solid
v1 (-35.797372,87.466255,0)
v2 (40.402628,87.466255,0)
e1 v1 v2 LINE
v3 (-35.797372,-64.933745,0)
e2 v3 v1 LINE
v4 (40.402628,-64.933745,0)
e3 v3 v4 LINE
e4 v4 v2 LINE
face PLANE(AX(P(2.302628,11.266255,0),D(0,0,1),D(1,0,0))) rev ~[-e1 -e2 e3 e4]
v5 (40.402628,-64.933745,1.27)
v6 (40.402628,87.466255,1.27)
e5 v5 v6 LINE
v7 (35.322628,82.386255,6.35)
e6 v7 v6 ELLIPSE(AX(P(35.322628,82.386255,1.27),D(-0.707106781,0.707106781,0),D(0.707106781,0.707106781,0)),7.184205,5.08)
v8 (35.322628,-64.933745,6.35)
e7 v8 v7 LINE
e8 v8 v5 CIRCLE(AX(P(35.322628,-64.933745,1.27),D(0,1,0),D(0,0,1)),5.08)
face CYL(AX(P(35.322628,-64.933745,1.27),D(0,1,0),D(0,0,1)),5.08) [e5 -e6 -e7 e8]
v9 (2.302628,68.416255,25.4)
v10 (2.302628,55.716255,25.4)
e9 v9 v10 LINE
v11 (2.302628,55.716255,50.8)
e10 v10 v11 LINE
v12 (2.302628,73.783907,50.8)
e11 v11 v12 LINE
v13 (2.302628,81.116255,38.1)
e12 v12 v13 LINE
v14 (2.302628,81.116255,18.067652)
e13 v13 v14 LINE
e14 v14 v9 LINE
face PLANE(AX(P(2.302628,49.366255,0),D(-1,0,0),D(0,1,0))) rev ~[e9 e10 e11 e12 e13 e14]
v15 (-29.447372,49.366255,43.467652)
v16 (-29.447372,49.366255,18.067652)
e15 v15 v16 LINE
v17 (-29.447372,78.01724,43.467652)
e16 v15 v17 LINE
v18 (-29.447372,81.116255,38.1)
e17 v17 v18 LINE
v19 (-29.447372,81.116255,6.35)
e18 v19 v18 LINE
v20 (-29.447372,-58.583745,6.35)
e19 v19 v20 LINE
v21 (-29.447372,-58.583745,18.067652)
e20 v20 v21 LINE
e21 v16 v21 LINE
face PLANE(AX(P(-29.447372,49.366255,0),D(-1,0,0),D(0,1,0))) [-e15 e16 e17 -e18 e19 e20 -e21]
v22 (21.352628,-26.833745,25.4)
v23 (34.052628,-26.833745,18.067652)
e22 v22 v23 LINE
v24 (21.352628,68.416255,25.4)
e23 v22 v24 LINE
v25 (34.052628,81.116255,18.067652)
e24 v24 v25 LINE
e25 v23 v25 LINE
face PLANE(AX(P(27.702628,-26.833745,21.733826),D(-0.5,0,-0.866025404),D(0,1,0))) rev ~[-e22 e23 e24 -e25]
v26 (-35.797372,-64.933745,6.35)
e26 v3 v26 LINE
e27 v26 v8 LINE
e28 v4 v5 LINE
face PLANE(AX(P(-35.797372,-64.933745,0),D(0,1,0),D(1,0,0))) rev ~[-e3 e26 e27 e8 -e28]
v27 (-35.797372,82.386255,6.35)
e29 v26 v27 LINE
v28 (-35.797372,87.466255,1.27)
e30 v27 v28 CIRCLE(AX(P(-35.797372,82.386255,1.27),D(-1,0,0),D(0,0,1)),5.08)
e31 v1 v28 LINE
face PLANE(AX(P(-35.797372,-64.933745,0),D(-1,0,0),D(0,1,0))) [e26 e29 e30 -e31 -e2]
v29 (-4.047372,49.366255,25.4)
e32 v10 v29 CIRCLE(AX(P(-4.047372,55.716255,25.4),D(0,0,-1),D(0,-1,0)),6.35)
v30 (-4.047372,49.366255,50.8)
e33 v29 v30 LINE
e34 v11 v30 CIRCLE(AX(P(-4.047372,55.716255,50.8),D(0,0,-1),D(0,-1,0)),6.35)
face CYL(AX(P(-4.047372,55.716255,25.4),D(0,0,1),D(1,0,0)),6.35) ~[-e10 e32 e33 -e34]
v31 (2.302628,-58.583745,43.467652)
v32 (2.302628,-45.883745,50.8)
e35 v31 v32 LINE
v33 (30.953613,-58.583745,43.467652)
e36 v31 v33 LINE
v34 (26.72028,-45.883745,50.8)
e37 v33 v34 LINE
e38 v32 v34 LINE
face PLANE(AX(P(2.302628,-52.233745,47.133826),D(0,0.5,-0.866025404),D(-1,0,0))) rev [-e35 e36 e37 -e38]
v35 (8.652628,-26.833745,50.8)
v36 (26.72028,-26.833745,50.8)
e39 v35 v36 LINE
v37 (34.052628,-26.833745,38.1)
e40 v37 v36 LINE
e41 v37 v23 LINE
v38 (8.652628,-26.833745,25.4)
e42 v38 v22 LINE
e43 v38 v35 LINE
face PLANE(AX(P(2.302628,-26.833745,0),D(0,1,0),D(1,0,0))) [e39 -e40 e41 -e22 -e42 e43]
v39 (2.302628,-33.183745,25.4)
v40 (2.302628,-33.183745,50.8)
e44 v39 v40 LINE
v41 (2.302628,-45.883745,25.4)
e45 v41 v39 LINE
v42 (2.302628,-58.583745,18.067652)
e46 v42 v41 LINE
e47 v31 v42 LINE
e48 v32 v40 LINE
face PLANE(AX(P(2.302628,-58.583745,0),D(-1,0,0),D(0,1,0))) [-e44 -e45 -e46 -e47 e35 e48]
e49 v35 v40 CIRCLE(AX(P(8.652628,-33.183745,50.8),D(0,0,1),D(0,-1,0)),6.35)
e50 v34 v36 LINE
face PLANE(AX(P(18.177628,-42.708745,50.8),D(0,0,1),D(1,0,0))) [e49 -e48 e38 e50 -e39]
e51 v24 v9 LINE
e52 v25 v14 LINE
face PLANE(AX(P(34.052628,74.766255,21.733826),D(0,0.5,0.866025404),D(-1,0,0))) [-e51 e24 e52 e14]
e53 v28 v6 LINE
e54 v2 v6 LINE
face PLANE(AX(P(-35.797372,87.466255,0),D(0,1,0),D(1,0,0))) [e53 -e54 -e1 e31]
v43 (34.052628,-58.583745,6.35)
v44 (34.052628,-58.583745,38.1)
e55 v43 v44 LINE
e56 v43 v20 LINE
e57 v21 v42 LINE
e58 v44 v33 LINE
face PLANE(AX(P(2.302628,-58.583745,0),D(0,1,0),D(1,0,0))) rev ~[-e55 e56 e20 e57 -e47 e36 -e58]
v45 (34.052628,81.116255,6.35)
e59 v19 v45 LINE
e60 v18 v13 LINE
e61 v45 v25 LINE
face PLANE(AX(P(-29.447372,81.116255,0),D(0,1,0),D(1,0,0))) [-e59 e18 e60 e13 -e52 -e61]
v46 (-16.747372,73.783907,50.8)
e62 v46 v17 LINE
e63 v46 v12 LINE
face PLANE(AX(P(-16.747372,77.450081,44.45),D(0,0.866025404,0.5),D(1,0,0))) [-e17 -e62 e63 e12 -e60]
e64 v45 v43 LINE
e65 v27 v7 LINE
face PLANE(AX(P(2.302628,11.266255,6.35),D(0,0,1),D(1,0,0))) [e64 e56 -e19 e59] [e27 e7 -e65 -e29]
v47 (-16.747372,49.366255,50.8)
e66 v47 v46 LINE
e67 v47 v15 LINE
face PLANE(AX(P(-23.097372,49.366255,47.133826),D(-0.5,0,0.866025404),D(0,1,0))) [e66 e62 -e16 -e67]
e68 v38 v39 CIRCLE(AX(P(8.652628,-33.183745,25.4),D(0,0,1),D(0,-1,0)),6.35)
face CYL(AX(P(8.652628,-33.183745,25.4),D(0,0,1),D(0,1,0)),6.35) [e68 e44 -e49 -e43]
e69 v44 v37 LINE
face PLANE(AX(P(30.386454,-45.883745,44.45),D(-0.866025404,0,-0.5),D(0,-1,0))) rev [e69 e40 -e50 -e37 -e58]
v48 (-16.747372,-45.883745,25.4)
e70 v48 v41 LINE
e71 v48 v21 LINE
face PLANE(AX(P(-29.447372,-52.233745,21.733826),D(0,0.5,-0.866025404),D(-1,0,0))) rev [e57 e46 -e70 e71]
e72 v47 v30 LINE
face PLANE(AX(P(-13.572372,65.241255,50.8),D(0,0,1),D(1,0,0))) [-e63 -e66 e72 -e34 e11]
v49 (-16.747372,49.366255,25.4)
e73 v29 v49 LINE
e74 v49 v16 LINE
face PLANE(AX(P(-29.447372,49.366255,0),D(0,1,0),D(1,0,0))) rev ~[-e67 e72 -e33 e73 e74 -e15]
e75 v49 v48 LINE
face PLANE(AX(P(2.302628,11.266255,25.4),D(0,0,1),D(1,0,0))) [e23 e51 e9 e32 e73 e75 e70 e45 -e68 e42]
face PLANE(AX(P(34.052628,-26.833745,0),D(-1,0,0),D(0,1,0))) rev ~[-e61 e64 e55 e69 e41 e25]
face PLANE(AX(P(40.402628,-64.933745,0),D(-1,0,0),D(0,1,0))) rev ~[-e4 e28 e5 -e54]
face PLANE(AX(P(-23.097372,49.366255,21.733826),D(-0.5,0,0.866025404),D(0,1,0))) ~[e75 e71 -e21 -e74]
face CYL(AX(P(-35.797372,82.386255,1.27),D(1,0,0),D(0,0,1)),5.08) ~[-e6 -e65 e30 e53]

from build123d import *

# Parameters (mm, degrees)
F0_W        = 76.2
F0_H        = 152.4
F1_DEPTH    = 6.35
F2_DEPTH    = 25.4
F0_W_2      = 31.75
F0_H_2      = 31.75
F3_DEPTH    = 50.8
F4_C1_SIZE2 = 12.7
F4_C1_SIZE  = 7.3323484187
F4_C2_SIZE2 = 12.7
F4_C2_SIZE  = 7.3323484187
F4_C3_SIZE2 = 7.3323484187
F4_C3_SIZE  = 12.7
F4_C4_SIZE2 = 12.7
F4_C4_SIZE  = 7.3323484187
F4_C5_SIZE2 = 7.3323484187
F4_C5_SIZE  = 12.7
F4_C6_SIZE2 = 7.3323484187
F4_C6_SIZE  = 12.7
F4_C7_SIZE2 = 7.3323484187
F4_C7_SIZE  = 12.7
F4_C8_SIZE2 = 12.7
F4_C8_SIZE  = 7.3323484187
F5_R        = 6.35
F6_R        = 5.08


with BuildPart() as f1:
    # F0 (on Top) → F1 (new body)
    with BuildSketch(Plane.XY):
        with Locations((2.3026284762, 11.2662552908)):
            Rectangle(F0_W, F0_H)
        Polygon((-29.4473715238, 49.3662552908), (-29.4473715238, 81.1162552908), (2.3026284762, 81.1162552908), (34.0526284762, 81.1162552908), (34.0526284762, -26.8337447092), (34.0526284762, -58.5837447092), (2.3026284762, -58.5837447092), (-29.4473715238, -58.5837447092), align=None, mode=Mode.SUBTRACT)
    extrude(amount=F1_DEPTH)

    # F0 (on Top) → F2 (join)
    with BuildSketch(Plane.XY):
        Polygon((34.0526284762, 81.1162552908), (2.3026284762, 81.1162552908), (2.3026284762, 49.3662552908), (-29.4473715238, 49.3662552908), (-29.4473715238, -58.5837447092), (2.3026284762, -58.5837447092), (2.3026284762, -26.8337447092), (34.0526284762, -26.8337447092), align=None)
    extrude(amount=F2_DEPTH)

    # F0 (on Top) → F3 (join)
    with BuildSketch(Plane.XY):
        with Locations((-13.5723715238, 65.2412552908)):
            Rectangle(F0_W_2, F0_H_2)
        with Locations((18.1776284762, -42.7087447092)):
            Rectangle(F0_W_2, F0_H_2)
    extrude(amount=F3_DEPTH)

    # F4: chamfer of 12.7 x 7.3323484187 on 8 edges, made by hand

    # F4_c1
    f4_c1_edges = [f1.edges().sort_by_distance(p)[0] for p in [
        (-13.5723715238, -58.5837447092, 25.4),
    ]]
    f4_c1_side = f1.faces().sort_by_distance((-13.5723715238, -58.5837447092, 25.2533530316))[0]
    chamfer(f4_c1_edges, length=F4_C1_SIZE, length2=F4_C1_SIZE2, reference=f4_c1_side)

    # F4_c2
    f4_c2_edges = [f1.edges().sort_by_distance(p)[0] for p in [
        (18.1776284762, -58.5837447092, 50.8),
    ]]
    f4_c2_side = f1.faces().sort_by_distance((18.1776284762, -58.5837447092, 50.6533530316))[0]
    chamfer(f4_c2_edges, length=F4_C2_SIZE, length2=F4_C2_SIZE2, reference=f4_c2_side)

    # F4_c3
    f4_c3_edges = [f1.edges().sort_by_distance(p)[0] for p in [
        (34.0526284762, -36.3587447092, 50.8),
    ]]
    f4_c3_side = f1.faces().sort_by_distance((34.0526284762, -36.3587447092, 50.6533530316))[0]
    chamfer(f4_c3_edges, length=F4_C3_SIZE, length2=F4_C3_SIZE2, reference=f4_c3_side)

    # F4_c4
    f4_c4_edges = [f1.edges().sort_by_distance(p)[0] for p in [
        (18.1776284762, 81.1162552908, 25.4),
    ]]
    f4_c4_side = f1.faces().sort_by_distance((18.1776284762, 81.1162552908, 25.2533530316))[0]
    chamfer(f4_c4_edges, length=F4_C4_SIZE, length2=F4_C4_SIZE2, reference=f4_c4_side)

    # F4_c5
    f4_c5_edges = [f1.edges().sort_by_distance(p)[0] for p in [
        (-29.4473715238, 1.7412552908, 25.4),
    ]]
    f4_c5_side = f1.faces().sort_by_distance((-29.3007245555, 1.7412552908, 25.4))[0]
    chamfer(f4_c5_edges, length=F4_C5_SIZE, length2=F4_C5_SIZE2, reference=f4_c5_side)

    # F4_c6
    f4_c6_edges = [f1.edges().sort_by_distance(p)[0] for p in [
        (34.0526284762, 20.7912552908, 25.4),
    ]]
    f4_c6_side = f1.faces().sort_by_distance((33.9059815078, 20.7912552908, 25.4))[0]
    chamfer(f4_c6_edges, length=F4_C6_SIZE, length2=F4_C6_SIZE2, reference=f4_c6_side)

    # F4_c7
    f4_c7_edges = [f1.edges().sort_by_distance(p)[0] for p in [
        (-29.4473715238, 65.2412552908, 50.8),
    ]]
    f4_c7_side = f1.faces().sort_by_distance((-29.3007245555, 65.2412552908, 50.8))[0]
    chamfer(f4_c7_edges, length=F4_C7_SIZE, length2=F4_C7_SIZE2, reference=f4_c7_side)

    # F4_c8
    f4_c8_edges = [f1.edges().sort_by_distance(p)[0] for p in [
        (-7.2223715238, 81.1162552908, 50.8),
    ]]
    f4_c8_side = f1.faces().sort_by_distance((-7.2223715238, 80.9696083224, 50.8))[0]
    chamfer(f4_c8_edges, length=F4_C8_SIZE, length2=F4_C8_SIZE2, reference=f4_c8_side)

    # F5
    f5_edges = [f1.edges().sort_by_distance(p)[0] for p in [
        (2.302628, 49.366255, 38.1),
        (2.302628, -26.833745, 38.1),
    ]]
    fillet(f5_edges, radius=F5_R)

    # F6
    f6_edges = [f1.edges().sort_by_distance(p)[0] for p in [
        (2.302628, 87.466255, 6.35),
        (40.402628, 11.266255, 6.35),
    ]]
    fillet(f6_edges, radius=F6_R)


solid = f1.part
